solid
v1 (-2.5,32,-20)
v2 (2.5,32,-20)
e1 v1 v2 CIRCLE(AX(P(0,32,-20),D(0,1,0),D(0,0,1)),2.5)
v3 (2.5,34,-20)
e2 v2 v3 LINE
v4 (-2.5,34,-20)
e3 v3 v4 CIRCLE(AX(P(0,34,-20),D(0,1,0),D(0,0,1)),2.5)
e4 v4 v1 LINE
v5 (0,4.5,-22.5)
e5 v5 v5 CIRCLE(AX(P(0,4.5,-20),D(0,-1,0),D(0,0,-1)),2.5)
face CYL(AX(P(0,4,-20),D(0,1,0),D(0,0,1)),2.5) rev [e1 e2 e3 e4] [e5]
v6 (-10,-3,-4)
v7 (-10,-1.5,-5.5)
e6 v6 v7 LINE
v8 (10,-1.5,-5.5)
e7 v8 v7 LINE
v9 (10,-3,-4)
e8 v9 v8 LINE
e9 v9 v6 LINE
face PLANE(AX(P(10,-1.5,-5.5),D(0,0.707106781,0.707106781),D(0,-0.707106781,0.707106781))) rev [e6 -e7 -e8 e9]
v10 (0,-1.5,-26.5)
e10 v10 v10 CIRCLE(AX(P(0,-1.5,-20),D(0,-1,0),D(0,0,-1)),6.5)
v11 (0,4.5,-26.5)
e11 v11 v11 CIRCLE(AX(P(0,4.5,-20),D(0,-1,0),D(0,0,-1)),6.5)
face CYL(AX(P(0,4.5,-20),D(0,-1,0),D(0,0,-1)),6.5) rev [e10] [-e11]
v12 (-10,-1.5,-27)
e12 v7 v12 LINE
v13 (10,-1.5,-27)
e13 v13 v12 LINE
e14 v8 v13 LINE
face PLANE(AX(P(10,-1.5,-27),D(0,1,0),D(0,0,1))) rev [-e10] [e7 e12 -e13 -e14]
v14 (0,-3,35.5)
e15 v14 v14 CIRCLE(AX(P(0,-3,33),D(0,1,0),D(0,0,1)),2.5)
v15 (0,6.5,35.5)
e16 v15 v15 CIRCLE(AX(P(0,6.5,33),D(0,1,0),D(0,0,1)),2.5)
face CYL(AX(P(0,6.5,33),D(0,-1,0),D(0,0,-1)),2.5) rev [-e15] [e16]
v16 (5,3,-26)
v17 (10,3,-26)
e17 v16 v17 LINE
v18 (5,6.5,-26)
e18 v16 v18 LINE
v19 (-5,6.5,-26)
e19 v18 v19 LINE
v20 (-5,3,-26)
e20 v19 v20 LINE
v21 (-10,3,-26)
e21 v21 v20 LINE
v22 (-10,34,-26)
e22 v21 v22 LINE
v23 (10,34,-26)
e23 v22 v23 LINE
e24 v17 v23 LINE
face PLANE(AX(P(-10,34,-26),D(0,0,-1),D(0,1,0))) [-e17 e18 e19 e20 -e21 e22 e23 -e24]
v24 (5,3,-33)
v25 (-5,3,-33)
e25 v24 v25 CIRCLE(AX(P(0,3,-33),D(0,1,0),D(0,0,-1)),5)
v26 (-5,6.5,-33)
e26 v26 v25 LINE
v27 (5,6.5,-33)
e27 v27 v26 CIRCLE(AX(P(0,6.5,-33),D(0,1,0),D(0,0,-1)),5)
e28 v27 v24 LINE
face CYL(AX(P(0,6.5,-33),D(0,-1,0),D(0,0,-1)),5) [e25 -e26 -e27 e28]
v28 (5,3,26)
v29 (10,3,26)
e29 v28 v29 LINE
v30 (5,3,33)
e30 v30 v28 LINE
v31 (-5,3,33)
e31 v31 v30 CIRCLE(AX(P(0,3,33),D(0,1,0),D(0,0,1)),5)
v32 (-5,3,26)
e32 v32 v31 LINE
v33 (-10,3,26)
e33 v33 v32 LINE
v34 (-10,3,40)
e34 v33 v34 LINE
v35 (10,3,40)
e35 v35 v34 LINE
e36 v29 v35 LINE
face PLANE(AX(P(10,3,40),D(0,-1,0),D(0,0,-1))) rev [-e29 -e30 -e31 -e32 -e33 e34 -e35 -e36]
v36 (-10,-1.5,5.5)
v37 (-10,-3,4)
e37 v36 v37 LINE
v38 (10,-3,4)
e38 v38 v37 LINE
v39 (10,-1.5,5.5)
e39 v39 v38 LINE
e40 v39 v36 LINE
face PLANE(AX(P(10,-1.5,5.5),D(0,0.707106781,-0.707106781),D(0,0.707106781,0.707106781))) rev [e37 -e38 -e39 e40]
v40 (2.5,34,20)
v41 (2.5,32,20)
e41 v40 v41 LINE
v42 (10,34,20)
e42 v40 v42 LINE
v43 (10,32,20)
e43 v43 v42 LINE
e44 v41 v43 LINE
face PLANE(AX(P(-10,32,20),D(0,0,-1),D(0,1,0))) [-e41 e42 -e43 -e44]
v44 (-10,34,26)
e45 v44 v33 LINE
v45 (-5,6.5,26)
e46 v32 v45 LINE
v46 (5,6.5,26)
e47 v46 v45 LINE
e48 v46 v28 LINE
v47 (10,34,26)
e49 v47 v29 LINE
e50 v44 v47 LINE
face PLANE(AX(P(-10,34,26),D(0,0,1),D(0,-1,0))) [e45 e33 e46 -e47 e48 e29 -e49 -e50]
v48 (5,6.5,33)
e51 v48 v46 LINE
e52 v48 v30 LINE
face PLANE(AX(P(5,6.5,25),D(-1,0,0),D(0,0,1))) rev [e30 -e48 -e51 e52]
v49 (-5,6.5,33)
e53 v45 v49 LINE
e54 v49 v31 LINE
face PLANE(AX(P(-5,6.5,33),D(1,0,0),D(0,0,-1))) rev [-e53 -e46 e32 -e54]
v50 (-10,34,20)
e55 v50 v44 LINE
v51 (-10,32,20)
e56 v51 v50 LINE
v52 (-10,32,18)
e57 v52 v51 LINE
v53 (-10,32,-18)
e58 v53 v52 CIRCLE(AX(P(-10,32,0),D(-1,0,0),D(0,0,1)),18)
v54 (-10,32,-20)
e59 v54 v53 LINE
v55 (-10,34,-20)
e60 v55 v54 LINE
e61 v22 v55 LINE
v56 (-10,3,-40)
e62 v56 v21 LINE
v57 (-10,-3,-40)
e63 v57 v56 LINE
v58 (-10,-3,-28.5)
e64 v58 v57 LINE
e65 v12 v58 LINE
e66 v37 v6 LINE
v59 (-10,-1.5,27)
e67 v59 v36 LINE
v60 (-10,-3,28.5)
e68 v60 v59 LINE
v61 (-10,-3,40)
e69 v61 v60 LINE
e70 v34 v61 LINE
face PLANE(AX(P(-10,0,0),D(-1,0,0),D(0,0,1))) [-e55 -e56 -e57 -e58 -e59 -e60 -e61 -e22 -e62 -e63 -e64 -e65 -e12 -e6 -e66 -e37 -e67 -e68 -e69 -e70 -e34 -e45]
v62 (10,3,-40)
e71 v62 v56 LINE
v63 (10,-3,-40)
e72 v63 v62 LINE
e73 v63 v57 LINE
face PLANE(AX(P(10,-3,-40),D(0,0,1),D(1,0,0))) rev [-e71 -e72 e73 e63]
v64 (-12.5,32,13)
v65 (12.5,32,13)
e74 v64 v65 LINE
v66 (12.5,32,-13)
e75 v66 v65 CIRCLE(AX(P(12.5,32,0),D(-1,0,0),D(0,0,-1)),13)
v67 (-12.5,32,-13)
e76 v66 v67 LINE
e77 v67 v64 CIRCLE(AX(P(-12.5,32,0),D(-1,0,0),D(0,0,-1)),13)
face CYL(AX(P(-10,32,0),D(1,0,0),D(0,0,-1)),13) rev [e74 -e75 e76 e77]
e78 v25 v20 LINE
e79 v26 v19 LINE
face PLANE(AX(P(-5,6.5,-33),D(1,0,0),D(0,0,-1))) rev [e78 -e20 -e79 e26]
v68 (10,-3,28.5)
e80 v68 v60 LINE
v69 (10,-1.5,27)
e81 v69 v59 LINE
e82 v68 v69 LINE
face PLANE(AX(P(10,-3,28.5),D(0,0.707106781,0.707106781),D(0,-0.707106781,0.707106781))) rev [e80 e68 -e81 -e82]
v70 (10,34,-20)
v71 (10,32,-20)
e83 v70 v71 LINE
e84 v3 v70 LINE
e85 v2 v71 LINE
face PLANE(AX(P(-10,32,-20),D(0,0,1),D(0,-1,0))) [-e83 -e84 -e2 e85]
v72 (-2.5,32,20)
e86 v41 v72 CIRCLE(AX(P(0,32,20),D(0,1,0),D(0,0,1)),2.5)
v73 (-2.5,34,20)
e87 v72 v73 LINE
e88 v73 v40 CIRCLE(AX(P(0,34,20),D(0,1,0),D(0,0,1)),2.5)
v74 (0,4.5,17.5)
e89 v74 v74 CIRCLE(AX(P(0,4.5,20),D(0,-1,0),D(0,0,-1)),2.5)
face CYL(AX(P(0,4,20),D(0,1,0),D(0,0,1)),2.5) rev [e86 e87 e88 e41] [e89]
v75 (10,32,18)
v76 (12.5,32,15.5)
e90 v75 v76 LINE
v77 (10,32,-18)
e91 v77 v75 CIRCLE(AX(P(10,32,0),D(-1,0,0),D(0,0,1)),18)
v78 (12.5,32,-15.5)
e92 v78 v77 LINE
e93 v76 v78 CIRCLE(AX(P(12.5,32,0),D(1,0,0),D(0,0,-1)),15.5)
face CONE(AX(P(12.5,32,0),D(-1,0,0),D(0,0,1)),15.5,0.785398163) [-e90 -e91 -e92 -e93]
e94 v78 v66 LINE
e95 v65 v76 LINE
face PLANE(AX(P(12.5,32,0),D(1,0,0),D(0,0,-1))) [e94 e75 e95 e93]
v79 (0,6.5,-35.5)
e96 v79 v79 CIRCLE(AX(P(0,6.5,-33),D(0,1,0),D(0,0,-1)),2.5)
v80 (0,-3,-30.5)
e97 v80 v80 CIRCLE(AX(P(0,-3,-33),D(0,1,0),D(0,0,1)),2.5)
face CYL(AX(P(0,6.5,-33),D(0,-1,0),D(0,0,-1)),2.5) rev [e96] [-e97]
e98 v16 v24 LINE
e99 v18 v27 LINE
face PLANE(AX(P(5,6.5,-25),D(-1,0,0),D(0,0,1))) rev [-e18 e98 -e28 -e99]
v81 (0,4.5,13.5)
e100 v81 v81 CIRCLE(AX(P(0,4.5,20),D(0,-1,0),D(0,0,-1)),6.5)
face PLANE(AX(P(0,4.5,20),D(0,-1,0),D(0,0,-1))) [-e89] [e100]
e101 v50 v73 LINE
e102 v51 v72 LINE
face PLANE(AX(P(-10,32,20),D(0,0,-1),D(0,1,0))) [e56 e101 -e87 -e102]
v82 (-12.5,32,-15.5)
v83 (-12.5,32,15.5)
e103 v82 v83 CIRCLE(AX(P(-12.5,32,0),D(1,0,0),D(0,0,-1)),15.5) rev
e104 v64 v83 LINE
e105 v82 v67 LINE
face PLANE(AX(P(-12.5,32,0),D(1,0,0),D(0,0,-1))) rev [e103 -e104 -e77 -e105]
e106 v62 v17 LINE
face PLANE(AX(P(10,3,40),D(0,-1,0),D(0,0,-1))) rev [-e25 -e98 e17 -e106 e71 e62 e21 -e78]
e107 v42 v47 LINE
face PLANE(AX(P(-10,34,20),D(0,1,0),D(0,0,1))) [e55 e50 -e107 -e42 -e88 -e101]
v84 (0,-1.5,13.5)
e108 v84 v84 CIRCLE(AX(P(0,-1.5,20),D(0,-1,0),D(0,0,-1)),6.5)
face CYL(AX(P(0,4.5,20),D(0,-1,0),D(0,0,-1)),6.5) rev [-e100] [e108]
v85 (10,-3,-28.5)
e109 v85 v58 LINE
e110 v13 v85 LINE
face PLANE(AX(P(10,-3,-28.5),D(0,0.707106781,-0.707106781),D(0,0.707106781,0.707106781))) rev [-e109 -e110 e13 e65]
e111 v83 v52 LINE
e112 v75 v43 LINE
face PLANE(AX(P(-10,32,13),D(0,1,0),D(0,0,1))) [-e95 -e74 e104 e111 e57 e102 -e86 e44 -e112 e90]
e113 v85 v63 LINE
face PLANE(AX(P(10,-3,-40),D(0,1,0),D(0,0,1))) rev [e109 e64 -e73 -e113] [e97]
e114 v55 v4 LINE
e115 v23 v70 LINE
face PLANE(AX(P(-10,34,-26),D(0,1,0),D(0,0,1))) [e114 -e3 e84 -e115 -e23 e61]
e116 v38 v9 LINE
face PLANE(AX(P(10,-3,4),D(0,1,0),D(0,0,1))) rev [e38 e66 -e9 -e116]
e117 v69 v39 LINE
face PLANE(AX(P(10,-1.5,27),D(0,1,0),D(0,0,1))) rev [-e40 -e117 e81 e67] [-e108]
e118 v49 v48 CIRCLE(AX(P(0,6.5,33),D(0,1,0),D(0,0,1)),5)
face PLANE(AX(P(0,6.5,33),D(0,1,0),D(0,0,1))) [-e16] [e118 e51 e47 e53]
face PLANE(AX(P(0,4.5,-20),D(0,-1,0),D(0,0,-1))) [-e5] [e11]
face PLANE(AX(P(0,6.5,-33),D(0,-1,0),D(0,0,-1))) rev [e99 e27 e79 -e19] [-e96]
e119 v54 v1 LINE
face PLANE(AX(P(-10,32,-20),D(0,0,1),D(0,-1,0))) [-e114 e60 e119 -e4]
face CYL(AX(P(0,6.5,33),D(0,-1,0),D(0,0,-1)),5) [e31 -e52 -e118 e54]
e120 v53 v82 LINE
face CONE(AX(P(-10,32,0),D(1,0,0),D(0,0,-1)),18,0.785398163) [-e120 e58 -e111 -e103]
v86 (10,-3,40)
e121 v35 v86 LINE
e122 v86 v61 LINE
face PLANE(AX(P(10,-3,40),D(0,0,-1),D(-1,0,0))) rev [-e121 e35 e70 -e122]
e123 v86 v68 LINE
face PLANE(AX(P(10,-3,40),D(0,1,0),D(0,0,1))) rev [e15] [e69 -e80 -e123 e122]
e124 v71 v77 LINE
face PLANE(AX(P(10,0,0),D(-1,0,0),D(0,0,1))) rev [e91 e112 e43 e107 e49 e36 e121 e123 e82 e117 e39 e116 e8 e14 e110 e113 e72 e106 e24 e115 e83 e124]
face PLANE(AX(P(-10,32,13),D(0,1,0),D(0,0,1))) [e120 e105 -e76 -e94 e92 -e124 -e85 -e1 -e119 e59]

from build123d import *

# Parameters (mm, degrees)
BOSS_EXTRUDE1_DEPTH      = 10
BOSS_EXTRUDE2_DEPTH      = 20
SKETCH3_R                = 2.5
BOSS_EXTRUDE4_DEPTH      = 3.5
SKETCH5_R                = 2.5
CUT_EXTRUDE2_DEPTH       = 52.584881506
SKETCH6_R                = 13
CUT_EXTRUDE3_DEPTH       = 57.178287621
BOSS_EXTRUDE5_DEPTH      = 2.5
BOSS_EXTRUDE5_DEPTH_BACK = 22.5
SKETCH14_R               = 6.5
CUT_EXTRUDE6_DEPTH       = 6
BOSS_EXTRUDE6_DEPTH      = 2.5
BOSS_EXTRUDE6_DEPTH_BACK = 22.5
CHAMFER1_SIZE            = 2.5
SKETCH15_R               = 2.5
CUT_EXTRUDE7_DEPTH       = 30


with BuildPart() as part:
    # Sketch1 → Boss-Extrude1 (new, symmetric)
    with BuildSketch(Plane(origin=(0, 0, 0), x_dir=(0, 0, -1), z_dir=(1, 0, 0))):
        Polygon((-40, -3), (-28.5, -3), (-27, -1.5), (-5.5, -1.5), (-4, -3), (4, -3), (5.5, -1.5), (27, -1.5), (28.5, -3), (40, -3), (40, 3), (-40, 3), align=None)
    extrude(amount=BOSS_EXTRUDE1_DEPTH, both=True)

    # Sketch2 → Boss-Extrude2 (add)
    with BuildSketch(Plane(origin=(10, 0, 0), x_dir=(0, 0, -1), z_dir=(1, 0, 0))):
        Polygon((20, 32), (13, 32), (-13, 32), (-20, 32), (-20, 34), (-26, 34), (-26, 3), (26, 3), (26, 34), (20, 34), align=None)
    extrude(amount=-BOSS_EXTRUDE2_DEPTH)

    # Sketch3 → Boss-Extrude4 (add)
    # profile 1 of 2: a face of its own
    with BuildSketch(Plane(origin=(0, 3, 0), x_dir=(1, 0, 0), z_dir=(0, 1, 0))):
        with BuildLine():
            Line((-5, -33), (-5, -25))
            Line((-5, -25), (5, -25))
            Line((5, -25), (5, -33))
            ThreePointArc((5, -33), (0, -38), (-5, -33))
        make_face()
        with Locations(Location((0, -33, 0), (0, 0, 270))):
            Circle(SKETCH3_R, mode=Mode.SUBTRACT)
    # profile 2 of 2: a face of its own
    with BuildSketch(Plane(origin=(0, 3, 0), x_dir=(1, 0, 0), z_dir=(0, 1, 0))):
        with BuildLine():
            Line((5, 25), (5, 33))
            ThreePointArc((5, 33), (0, 38), (-5, 33))
            Line((-5, 33), (-5, 25))
            Line((-5, 25), (5, 25))
        make_face()
        with Locations(Location((0, 33, 0), (0, 0, 90))):
            Circle(SKETCH3_R, mode=Mode.SUBTRACT)
    extrude(amount=BOSS_EXTRUDE4_DEPTH)

    # Sketch5 → Cut-Extrude2 (cut, through all)
    with BuildSketch(Plane(origin=(0, 3, 0), x_dir=(1, 0, 0), z_dir=(0, 1, 0))):
        with Locations(Location((0, 33, 0), (0, 0, 90))):
            Circle(SKETCH5_R)
        with Locations(Location((0, -33, 0), (0, 0, 270))):
            Circle(SKETCH5_R)
    extrude(amount=-CUT_EXTRUDE2_DEPTH, mode=Mode.SUBTRACT)

    # Sketch6 → Cut-Extrude3 (cut, through all)
    with BuildSketch(Plane(origin=(10, 0, 0), x_dir=(0, 0, -1), z_dir=(1, 0, 0))):
        with Locations((0, 32)):
            Circle(SKETCH6_R)
    extrude(amount=-CUT_EXTRUDE3_DEPTH, mode=Mode.SUBTRACT)

    # Sketch8 → Boss-Extrude5 (add, two sides: drawn at the far end of the back side and taken through both)
    with BuildSketch(Plane(origin=(10, 0, 0), x_dir=(0, 0, -1), z_dir=(1, 0, 0)).offset(-BOSS_EXTRUDE5_DEPTH_BACK)):
        with BuildLine():
            Line((-13, 32), (-15, 32))
            ThreePointArc((-15, 32), (0, 17), (15, 32))
            Line((15, 32), (13, 32))
            ThreePointArc((13, 32), (0, 19), (-13, 32))
        make_face()
    extrude(amount=BOSS_EXTRUDE5_DEPTH + BOSS_EXTRUDE5_DEPTH_BACK)

    # Sketch14 → Cut-Extrude6 (cut)
    with BuildSketch(Plane.XZ.offset(1.5)):
        with Locations(Location((0, -20, 0), (0, 0, 270))):
            Circle(SKETCH14_R)
        with Locations(Location((0, 20, 0), (0, 0, 270))):
            Circle(SKETCH14_R)
    extrude(amount=-CUT_EXTRUDE6_DEPTH, mode=Mode.SUBTRACT)

    # Sketch10 → Boss-Extrude6 (add, two sides: drawn at the far end of the back side and taken through both)
    with BuildSketch(Plane(origin=(10, 0, 0), x_dir=(0, 0, -1), z_dir=(1, 0, 0)).offset(-BOSS_EXTRUDE6_DEPTH_BACK)):
        with BuildLine():
            Line((-18, 32), (-15, 32))
            ThreePointArc((-15, 32), (0, 17), (15, 32))
            Line((15, 32), (18, 32))
            ThreePointArc((18, 32), (0, 14), (-18, 32))
        make_face()
    extrude(amount=BOSS_EXTRUDE6_DEPTH + BOSS_EXTRUDE6_DEPTH_BACK)

    # Chamfer1
    chamfer1_edges = [part.edges().sort_by_distance(p)[0] for p in [
        (12.5, 14, 0),
        (-12.5, 14, 0),
    ]]
    chamfer(chamfer1_edges, length=CHAMFER1_SIZE - 0.0001)  # a hair under: the kernel refuses the full size

    # Sketch15 → Cut-Extrude7 (cut)
    with BuildSketch(Plane(origin=(0, 34, 0), x_dir=(1, 0, 0), z_dir=(0, 1, 0))):
        with Locations((0, -20)):
            Circle(SKETCH15_R)
        with Locations(Location((0, 20, 0), (0, 0, 180))):
            Circle(SKETCH15_R)
    extrude(amount=-CUT_EXTRUDE7_DEPTH, mode=Mode.SUBTRACT)


solid = part.part
